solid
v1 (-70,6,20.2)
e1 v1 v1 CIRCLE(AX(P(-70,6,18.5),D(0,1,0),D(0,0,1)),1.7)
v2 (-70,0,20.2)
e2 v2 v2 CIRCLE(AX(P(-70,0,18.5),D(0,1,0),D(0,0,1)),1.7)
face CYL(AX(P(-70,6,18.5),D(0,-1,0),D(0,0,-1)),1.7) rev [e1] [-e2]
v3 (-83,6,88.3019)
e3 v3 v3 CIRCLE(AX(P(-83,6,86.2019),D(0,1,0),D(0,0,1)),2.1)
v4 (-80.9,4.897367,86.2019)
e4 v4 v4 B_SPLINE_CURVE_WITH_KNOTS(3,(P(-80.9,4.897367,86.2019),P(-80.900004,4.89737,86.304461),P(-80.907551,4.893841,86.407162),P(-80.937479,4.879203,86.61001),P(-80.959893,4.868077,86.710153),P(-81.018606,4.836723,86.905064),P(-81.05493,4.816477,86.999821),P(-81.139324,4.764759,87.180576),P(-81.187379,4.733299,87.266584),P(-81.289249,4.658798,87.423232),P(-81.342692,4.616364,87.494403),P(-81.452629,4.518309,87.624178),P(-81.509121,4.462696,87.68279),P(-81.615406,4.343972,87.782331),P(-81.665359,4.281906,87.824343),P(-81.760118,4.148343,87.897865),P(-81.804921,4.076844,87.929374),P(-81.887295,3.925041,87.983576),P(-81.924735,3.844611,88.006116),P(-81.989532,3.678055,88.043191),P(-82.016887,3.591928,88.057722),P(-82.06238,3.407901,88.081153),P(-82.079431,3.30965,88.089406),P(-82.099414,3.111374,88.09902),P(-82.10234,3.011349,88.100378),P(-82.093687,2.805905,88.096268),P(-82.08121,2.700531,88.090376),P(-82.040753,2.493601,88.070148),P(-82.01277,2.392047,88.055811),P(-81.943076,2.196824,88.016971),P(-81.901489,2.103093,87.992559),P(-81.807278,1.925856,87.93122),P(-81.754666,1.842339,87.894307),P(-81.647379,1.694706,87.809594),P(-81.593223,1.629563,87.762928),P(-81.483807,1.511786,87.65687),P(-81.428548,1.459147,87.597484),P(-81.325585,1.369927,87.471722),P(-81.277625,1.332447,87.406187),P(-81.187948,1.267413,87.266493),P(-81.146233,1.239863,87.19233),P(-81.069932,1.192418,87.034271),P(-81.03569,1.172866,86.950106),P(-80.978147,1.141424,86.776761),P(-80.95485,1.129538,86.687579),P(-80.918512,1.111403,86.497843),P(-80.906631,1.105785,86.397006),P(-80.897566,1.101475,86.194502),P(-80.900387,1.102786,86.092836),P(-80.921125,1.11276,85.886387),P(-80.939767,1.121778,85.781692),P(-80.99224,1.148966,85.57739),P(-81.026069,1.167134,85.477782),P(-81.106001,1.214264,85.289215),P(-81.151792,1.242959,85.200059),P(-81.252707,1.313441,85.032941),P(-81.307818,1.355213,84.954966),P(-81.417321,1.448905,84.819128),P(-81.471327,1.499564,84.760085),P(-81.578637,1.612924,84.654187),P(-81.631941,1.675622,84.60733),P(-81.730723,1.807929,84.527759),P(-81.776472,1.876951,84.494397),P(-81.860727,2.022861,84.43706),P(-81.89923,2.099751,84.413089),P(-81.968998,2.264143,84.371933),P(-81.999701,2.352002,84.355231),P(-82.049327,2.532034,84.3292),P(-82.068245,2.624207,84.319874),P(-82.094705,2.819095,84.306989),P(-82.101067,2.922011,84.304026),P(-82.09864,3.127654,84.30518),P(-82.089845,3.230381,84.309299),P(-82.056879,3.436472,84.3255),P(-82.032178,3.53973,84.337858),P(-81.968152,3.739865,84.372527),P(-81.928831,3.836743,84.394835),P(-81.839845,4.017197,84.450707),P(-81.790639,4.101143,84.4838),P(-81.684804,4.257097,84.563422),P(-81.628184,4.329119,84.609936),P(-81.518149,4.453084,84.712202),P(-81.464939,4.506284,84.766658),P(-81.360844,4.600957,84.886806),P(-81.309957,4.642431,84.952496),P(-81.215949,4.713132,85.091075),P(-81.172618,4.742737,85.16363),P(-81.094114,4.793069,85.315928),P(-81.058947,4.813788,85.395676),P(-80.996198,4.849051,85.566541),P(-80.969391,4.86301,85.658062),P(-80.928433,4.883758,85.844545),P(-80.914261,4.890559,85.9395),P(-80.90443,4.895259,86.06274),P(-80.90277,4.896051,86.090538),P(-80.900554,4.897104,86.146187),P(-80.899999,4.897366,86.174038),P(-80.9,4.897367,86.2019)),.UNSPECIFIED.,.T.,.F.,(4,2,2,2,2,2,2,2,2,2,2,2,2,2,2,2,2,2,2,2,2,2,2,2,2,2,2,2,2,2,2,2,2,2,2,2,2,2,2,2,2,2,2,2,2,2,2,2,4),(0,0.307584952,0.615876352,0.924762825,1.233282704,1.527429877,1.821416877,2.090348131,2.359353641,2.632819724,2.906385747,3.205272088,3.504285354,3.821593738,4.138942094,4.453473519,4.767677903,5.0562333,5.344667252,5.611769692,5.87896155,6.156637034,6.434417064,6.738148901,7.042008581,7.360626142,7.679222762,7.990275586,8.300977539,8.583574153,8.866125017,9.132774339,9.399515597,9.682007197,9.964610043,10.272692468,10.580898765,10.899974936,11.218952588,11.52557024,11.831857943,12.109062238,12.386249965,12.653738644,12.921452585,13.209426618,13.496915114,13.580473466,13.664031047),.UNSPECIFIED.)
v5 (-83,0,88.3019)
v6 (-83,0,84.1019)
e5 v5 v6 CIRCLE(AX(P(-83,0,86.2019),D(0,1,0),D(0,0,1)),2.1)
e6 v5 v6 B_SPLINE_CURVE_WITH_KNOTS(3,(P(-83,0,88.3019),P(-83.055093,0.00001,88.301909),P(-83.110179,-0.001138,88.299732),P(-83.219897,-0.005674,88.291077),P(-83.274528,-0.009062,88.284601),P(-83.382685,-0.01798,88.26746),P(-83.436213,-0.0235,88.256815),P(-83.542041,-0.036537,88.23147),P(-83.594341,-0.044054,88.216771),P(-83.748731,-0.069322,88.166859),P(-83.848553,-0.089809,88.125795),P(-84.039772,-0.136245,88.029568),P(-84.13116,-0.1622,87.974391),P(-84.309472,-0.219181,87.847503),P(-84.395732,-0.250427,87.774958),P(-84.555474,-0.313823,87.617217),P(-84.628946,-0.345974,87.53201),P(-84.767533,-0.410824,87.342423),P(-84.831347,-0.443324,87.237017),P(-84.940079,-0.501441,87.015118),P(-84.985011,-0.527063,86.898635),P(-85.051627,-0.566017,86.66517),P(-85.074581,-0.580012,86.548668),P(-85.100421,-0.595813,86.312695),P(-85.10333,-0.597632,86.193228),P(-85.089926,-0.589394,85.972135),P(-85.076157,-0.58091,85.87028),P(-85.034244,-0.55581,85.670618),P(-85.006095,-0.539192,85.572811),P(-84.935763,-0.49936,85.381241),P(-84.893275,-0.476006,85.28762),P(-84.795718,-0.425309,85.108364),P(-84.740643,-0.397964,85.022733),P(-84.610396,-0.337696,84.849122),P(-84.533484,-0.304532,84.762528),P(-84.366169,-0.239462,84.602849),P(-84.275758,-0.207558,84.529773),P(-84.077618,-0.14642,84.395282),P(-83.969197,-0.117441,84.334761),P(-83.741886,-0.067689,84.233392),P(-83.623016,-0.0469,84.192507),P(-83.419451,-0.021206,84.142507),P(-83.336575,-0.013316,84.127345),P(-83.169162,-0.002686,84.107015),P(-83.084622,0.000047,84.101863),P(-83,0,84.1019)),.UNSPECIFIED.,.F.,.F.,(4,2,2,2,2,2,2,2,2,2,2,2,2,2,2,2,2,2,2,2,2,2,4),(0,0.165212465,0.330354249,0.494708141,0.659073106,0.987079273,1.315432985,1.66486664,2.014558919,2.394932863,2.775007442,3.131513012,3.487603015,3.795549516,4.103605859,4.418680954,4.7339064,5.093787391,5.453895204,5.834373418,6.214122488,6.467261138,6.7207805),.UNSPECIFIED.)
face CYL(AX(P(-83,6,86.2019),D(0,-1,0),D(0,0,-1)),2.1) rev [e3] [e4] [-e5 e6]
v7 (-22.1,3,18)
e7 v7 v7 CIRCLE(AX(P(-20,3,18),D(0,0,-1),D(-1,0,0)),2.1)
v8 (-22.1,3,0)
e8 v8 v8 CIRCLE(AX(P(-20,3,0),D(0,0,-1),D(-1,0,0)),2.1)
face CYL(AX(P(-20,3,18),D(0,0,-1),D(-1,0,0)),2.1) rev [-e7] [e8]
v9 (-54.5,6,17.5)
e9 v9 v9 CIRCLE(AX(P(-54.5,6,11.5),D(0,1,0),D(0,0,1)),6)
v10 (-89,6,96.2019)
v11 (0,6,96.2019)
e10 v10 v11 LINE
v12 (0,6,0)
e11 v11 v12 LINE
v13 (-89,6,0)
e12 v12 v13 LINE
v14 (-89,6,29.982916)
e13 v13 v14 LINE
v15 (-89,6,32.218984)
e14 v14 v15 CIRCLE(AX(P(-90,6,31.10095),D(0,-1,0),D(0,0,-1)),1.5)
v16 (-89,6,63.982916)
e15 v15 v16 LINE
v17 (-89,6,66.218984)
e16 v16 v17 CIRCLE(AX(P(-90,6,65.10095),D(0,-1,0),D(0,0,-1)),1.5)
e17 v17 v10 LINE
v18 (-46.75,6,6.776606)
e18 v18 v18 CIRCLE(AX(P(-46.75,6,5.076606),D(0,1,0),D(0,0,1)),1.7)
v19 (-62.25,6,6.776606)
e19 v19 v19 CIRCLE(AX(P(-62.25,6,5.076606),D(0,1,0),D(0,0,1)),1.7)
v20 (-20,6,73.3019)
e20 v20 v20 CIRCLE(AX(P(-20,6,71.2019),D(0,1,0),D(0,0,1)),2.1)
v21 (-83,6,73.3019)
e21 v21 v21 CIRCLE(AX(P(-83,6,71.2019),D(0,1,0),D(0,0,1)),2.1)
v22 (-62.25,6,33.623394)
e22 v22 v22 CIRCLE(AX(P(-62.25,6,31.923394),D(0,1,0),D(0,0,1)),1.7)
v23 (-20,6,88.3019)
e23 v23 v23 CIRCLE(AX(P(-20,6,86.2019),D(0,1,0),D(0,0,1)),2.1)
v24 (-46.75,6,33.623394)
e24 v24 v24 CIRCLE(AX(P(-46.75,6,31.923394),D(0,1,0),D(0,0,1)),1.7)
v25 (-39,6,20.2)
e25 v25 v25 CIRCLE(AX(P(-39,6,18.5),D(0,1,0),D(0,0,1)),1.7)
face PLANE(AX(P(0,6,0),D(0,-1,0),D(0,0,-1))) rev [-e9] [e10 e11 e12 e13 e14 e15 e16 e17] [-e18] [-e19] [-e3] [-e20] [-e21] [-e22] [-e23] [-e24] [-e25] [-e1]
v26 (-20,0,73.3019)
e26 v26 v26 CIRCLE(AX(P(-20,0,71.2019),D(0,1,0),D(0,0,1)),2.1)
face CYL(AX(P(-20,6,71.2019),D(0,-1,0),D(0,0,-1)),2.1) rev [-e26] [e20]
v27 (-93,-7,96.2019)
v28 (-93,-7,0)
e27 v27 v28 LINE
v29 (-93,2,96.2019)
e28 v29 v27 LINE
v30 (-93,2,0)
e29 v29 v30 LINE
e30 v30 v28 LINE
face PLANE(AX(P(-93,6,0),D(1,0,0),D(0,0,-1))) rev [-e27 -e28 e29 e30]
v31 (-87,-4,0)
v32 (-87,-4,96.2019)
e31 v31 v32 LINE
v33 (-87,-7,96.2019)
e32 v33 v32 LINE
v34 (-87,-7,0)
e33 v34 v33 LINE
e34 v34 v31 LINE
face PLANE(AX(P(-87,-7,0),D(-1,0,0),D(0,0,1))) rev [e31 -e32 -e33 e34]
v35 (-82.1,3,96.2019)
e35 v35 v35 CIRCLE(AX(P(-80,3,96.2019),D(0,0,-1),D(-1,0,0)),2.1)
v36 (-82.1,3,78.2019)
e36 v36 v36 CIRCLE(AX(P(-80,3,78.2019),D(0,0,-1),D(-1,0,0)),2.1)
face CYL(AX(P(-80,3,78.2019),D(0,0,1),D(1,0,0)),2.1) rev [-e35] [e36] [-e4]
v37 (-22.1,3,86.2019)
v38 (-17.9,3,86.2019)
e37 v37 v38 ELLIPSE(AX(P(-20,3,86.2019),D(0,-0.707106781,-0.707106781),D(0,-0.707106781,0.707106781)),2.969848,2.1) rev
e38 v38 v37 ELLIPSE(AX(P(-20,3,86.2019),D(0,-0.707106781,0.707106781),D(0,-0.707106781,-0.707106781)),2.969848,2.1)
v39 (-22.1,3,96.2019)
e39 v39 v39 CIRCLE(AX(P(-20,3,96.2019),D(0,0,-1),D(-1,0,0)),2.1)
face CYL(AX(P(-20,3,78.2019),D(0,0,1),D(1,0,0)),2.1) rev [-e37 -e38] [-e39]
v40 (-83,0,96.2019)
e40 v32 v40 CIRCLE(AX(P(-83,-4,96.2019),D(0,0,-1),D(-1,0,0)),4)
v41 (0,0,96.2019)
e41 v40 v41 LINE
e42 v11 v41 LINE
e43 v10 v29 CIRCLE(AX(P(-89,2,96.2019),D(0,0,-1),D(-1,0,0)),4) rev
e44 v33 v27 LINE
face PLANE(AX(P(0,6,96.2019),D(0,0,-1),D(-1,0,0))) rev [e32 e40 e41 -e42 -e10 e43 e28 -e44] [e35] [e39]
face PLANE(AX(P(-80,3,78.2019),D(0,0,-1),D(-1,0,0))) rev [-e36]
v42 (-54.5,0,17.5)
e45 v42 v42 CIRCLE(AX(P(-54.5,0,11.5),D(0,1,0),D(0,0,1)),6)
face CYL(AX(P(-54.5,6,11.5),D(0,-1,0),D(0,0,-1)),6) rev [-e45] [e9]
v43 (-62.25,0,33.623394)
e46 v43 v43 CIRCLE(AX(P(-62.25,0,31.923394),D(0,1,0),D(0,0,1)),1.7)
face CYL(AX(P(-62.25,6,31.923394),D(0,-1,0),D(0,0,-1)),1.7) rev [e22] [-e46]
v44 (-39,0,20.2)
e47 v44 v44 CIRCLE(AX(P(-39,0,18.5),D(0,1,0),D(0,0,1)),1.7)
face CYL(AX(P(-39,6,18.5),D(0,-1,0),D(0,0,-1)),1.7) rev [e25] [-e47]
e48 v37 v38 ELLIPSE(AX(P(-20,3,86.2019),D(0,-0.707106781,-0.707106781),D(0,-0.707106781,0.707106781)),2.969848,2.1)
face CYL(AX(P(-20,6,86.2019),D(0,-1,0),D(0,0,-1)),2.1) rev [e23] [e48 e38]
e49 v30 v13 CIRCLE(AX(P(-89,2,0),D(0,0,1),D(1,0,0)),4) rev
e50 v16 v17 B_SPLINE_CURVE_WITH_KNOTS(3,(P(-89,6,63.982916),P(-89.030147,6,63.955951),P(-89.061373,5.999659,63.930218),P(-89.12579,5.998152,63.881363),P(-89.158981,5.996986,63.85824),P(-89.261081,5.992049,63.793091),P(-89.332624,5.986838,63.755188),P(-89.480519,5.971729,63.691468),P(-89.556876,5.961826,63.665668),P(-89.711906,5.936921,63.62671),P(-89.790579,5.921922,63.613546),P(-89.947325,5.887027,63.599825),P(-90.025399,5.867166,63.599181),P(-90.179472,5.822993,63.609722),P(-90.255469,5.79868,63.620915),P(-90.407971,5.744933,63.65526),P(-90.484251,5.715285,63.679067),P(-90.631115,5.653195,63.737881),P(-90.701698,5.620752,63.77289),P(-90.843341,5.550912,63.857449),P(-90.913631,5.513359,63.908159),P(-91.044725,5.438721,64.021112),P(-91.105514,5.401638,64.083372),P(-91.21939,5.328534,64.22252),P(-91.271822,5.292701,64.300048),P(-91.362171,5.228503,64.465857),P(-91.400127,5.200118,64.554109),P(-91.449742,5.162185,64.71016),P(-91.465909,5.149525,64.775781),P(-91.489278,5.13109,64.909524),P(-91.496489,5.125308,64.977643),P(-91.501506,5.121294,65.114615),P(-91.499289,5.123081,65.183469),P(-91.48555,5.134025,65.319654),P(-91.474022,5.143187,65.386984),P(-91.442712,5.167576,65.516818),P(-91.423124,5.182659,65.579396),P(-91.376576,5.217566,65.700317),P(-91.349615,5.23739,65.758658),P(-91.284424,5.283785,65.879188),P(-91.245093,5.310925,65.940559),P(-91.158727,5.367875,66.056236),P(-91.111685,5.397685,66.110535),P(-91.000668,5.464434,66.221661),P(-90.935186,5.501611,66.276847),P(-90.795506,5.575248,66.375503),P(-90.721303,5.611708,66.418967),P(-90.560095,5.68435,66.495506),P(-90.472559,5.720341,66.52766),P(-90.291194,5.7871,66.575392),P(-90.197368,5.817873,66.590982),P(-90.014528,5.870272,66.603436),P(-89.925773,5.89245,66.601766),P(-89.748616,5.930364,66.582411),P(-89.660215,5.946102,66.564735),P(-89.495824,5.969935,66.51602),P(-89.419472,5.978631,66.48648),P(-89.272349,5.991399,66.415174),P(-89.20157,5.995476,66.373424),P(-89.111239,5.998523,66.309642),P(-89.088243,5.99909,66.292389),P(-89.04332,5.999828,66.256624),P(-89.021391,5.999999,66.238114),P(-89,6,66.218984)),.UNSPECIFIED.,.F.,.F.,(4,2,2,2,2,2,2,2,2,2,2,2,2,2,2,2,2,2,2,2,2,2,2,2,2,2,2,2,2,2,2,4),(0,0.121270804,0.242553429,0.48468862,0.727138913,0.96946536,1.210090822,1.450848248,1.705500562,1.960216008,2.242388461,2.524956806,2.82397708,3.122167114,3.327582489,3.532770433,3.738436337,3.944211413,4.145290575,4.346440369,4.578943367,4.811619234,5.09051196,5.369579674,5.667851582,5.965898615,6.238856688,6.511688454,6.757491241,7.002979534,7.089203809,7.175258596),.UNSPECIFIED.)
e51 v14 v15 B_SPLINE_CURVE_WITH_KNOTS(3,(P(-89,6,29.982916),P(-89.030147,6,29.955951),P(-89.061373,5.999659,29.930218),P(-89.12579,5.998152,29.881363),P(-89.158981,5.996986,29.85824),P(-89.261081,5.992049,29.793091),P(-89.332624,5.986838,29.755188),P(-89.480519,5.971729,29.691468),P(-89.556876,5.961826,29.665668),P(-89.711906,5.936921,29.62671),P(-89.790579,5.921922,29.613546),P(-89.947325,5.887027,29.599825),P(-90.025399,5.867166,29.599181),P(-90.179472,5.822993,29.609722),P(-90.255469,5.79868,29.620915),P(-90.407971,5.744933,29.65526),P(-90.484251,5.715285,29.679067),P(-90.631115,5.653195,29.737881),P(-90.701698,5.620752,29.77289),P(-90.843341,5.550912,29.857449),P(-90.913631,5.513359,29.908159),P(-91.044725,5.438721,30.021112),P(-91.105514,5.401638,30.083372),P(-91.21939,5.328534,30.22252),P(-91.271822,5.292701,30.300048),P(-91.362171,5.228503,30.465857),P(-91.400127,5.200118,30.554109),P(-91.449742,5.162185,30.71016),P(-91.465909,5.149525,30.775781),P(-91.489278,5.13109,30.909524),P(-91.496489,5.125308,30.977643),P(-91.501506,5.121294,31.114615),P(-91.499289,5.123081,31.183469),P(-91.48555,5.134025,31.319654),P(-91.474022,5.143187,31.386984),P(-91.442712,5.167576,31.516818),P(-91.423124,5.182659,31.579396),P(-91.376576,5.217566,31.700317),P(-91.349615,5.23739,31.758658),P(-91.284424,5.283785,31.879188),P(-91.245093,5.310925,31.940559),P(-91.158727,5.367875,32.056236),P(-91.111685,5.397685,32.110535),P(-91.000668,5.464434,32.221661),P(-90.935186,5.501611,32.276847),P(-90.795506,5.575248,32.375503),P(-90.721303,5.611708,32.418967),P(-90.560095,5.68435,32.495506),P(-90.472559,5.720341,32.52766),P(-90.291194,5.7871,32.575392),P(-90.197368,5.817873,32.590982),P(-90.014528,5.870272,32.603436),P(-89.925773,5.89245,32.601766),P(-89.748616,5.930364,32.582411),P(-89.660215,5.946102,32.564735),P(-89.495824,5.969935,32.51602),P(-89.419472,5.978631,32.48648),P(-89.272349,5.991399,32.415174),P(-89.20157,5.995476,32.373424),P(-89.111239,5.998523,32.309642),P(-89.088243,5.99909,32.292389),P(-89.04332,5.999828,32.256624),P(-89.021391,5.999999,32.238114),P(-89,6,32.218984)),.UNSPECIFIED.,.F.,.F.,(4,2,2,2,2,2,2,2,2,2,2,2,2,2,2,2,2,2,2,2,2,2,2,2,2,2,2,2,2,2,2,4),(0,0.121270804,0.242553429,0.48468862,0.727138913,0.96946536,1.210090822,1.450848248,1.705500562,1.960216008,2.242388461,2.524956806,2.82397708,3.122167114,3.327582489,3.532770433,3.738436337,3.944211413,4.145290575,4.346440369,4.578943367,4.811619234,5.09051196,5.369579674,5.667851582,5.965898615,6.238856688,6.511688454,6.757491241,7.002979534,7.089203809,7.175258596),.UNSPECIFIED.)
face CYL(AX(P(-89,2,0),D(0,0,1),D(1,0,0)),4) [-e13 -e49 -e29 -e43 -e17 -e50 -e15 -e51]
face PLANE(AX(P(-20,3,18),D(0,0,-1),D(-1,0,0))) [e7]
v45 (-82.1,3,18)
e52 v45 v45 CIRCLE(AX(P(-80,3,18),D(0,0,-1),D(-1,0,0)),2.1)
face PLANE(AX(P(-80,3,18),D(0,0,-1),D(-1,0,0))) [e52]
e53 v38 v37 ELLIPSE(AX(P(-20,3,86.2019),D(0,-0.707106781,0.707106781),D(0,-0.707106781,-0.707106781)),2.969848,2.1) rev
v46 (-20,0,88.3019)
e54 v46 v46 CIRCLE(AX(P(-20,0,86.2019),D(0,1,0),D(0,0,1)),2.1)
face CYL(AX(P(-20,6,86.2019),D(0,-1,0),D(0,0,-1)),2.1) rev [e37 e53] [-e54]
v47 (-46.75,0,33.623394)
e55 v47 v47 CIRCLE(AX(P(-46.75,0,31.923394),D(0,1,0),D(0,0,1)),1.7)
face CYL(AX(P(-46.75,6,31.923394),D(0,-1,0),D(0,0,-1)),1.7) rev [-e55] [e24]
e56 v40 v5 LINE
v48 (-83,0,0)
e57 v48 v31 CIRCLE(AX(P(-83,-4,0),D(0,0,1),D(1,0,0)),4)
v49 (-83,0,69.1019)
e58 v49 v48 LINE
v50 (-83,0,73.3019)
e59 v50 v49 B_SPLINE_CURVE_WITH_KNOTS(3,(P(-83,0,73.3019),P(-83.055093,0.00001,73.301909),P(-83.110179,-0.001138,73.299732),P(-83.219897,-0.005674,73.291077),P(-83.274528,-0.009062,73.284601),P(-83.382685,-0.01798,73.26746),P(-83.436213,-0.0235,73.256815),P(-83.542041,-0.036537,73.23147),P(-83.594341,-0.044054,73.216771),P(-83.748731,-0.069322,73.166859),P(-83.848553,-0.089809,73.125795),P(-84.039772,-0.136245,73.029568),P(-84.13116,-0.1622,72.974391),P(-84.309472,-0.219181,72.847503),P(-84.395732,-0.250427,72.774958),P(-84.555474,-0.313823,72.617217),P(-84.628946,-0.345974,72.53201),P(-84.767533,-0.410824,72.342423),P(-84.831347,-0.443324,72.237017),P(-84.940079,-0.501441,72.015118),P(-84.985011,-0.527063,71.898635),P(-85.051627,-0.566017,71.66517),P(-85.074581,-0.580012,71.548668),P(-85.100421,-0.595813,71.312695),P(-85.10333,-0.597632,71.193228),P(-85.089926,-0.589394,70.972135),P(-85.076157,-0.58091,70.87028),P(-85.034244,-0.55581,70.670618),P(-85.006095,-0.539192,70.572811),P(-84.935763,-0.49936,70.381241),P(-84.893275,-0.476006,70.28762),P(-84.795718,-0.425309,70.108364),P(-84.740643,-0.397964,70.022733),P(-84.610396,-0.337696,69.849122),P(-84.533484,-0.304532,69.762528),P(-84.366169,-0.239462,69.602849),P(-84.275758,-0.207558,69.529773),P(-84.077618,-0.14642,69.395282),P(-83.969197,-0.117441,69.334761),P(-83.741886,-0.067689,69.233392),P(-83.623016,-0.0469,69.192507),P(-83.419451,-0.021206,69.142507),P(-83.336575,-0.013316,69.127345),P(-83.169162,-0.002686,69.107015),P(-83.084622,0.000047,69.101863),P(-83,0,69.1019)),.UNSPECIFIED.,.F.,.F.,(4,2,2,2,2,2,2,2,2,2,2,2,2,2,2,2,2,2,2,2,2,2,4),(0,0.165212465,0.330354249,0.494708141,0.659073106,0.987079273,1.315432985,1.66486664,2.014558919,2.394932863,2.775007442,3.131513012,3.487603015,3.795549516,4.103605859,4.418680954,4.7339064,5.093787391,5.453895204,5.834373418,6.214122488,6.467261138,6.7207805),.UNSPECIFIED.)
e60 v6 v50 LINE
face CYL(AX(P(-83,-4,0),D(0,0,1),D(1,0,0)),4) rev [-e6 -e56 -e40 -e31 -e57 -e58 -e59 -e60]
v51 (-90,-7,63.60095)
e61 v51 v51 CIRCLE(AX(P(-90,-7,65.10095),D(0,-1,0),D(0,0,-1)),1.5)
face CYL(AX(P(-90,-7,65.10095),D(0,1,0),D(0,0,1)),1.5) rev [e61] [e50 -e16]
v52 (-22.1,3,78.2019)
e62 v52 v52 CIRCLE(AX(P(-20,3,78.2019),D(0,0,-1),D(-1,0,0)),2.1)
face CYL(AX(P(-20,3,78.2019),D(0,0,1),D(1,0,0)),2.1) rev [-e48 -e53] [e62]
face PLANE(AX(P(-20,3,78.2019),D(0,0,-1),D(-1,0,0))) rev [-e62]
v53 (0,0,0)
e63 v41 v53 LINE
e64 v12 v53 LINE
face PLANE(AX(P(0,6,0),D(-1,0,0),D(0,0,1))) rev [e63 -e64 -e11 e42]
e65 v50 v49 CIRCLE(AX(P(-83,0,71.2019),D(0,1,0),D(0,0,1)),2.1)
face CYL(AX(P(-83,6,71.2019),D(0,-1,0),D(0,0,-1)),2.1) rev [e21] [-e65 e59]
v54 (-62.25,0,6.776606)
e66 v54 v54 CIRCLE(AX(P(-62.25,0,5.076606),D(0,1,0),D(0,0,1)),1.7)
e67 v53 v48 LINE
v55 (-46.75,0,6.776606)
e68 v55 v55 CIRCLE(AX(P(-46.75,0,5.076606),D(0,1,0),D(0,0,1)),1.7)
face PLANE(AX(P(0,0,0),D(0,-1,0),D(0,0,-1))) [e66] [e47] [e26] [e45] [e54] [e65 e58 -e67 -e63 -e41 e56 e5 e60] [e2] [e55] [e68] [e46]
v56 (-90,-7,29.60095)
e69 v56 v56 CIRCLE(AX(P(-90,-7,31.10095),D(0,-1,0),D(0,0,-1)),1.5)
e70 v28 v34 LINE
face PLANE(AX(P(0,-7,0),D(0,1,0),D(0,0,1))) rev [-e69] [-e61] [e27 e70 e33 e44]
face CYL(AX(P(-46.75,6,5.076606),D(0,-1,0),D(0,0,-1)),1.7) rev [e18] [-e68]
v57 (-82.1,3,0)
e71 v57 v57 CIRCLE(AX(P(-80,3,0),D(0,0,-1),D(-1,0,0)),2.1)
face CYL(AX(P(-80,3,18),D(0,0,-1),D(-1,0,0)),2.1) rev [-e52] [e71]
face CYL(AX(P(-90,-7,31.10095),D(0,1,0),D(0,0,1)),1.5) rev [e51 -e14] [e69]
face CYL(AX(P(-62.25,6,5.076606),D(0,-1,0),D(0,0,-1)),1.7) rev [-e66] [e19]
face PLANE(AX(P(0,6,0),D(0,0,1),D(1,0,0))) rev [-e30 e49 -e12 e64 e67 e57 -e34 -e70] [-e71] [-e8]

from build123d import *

# Parameters (mm, degrees)
SKETCH1_W           = 93
SKETCH1_H           = 96.2019
SKETCH1_R           = 6
SKETCH1_R_2         = 1.7
SKETCH1_R_3         = 2.1
BOSS_EXTRUDE1_DEPTH = 6
SKETCH2_W           = 6
SKETCH2_H           = 96.2019
SKETCH2_R           = 1.5
BOSS_EXTRUDE2_DEPTH = 7
SKETCH2_3_R         = 1.5
CUT_EXTRUDE2_DEPTH  = 134.988079931
FILLET1_R           = 4
SKETCH3_R           = 2.1
CUT_EXTRUDE3_DEPTH  = 18
CUT_EXTRUDE4_START  = -78.2019
SKETCH3_2_R         = 2.1
CUT_EXTRUDE4_DEPTH  = 18


with BuildPart() as part:
    # Sketch1 → Boss-Extrude1 (new body)
    with BuildSketch(Plane(origin=(0, 0, 0), x_dir=(-1, 0, 0), z_dir=(0, 1, 0))):
        with Locations((46.5, 48.10095)):
            Rectangle(SKETCH1_W, SKETCH1_H)
        with Locations(Location((54.5, 11.5, 0), (0, 0, 90))):
            Circle(SKETCH1_R, mode=Mode.SUBTRACT)
        with Locations(Location((39, 18.5, 0), (0, 0, 90))):
            Circle(SKETCH1_R_2, mode=Mode.SUBTRACT)
        with Locations(Location((46.75, 31.923393759, 0), (0, 0, 90))):
            Circle(SKETCH1_R_2, mode=Mode.SUBTRACT)
        with Locations(Location((62.25, 31.923393759, 0), (0, 0, 90))):
            Circle(SKETCH1_R_2, mode=Mode.SUBTRACT)
        with Locations(Location((70, 18.5, 0), (0, 0, 90))):
            Circle(SKETCH1_R_2, mode=Mode.SUBTRACT)
        with Locations(Location((62.25, 5.076606241, 0), (0, 0, 90))):
            Circle(SKETCH1_R_2, mode=Mode.SUBTRACT)
        with Locations(Location((46.75, 5.076606241, 0), (0, 0, 90))):
            Circle(SKETCH1_R_2, mode=Mode.SUBTRACT)
        with Locations(Location((20, 86.2019, 0), (0, 0, 90))):
            Circle(SKETCH1_R_3, mode=Mode.SUBTRACT)
        with Locations(Location((83, 86.2019, 0), (0, 0, 90))):
            Circle(SKETCH1_R_3, mode=Mode.SUBTRACT)
        with Locations(Location((83, 71.2019, 0), (0, 0, 90))):
            Circle(SKETCH1_R_3, mode=Mode.SUBTRACT)
        with Locations(Location((20, 71.2019, 0), (0, 0, 90))):
            Circle(SKETCH1_R_3, mode=Mode.SUBTRACT)
    extrude(amount=BOSS_EXTRUDE1_DEPTH)

    # Sketch2 → Boss-Extrude2 (add)
    with BuildSketch(Plane(origin=(0, 0, 0), x_dir=(-1, 0, 0), z_dir=(0, -1, 0))):
        with Locations((90, -48.10095)):
            Rectangle(SKETCH2_W, SKETCH2_H)
        with Locations(Location((90, -65.10095, 0), (0, 0, 90))):
            Circle(SKETCH2_R, mode=Mode.SUBTRACT)
        with Locations(Location((90, -31.10095, 0), (0, 0, 90))):
            Circle(SKETCH2_R, mode=Mode.SUBTRACT)
    extrude(amount=BOSS_EXTRUDE2_DEPTH)

    # Sketch2<3> → Cut-Extrude2 (cut, through all)
    with BuildSketch(Plane(origin=(0, 0, 0), x_dir=(-1, 0, 0), z_dir=(0, -1, 0))):
        with Locations(Location((90, -31.10095, 0), (0, 0, 90))):
            Circle(SKETCH2_3_R)
        with Locations(Location((90, -65.10095, 0), (0, 0, 90))):
            Circle(SKETCH2_3_R)
    extrude(amount=-CUT_EXTRUDE2_DEPTH, mode=Mode.SUBTRACT)

    # Fillet1
    # the kernel refuses this fillet: 4 mm, written as the material it adds along each edge
    with BuildSketch(Plane(origin=(-87, 0, 96.2019), x_dir=(0, -1, 0), z_dir=(0, 0, -1))) as fillet1_piece_1_section:
        with BuildLine():
            CenterArc((FILLET1_R, -FILLET1_R), FILLET1_R, 90, 90)
            Line((0, -FILLET1_R), (0, 0))
            Line((0, 0), (FILLET1_R, 0))
        make_face()
    fillet1_piece_1 = extrude(amount=96.2019, mode=Mode.PRIVATE)
    fillet1_piece_1 = fillet1_piece_1 - Plane(origin=(-83, -0.912137569, 71.2019), x_dir=(0, 0, 1), z_dir=(0, -1, 0)) * Cylinder(2.1, 209, mode=Mode.PRIVATE)
    fillet1_piece_1 = fillet1_piece_1 - Plane(origin=(-83, -0.912137569, 86.2019), x_dir=(0, 0, 1), z_dir=(0, -1, 0)) * Cylinder(2.1, 209, mode=Mode.PRIVATE)
    add(fillet1_piece_1)
    # the kernel refuses this fillet: 4 mm, written as the material it takes off along each edge
    with BuildSketch(Plane(origin=(-93, 6, -10), x_dir=(1, 0, 0), z_dir=(0, 0, 1))) as fillet1_2_piece_1:
        with BuildLine():
            CenterArc((FILLET1_R, -FILLET1_R), FILLET1_R, 90, 90)
            Line((0, -FILLET1_R), (0, 0))
            Line((0, 0), (FILLET1_R, 0))
        make_face()
    extrude(amount=116.2019, mode=Mode.SUBTRACT)

    # Sketch3 → Cut-Extrude3 (cut)
    with BuildSketch(Plane(origin=(0, 0, 0), x_dir=(1, 0, 0), z_dir=(0, 0, -1))):
        with Locations(Location((-80, -3, 0), (0, 0, 180))):
            Circle(SKETCH3_R)
        with Locations(Location((-20, -3, 0), (0, 0, 180))):
            Circle(SKETCH3_R)
    extrude(amount=-CUT_EXTRUDE3_DEPTH, mode=Mode.SUBTRACT)

    # Sketch3<2> → Cut-Extrude4 (cut)
    with BuildSketch(Plane(origin=(0, 0, 0), x_dir=(1, 0, 0), z_dir=(0, 0, -1)).offset(CUT_EXTRUDE4_START)):
        with Locations(Location((-80, -3, 0), (0, 0, 180))):
            Circle(SKETCH3_2_R)
        with Locations(Location((-20, -3, 0), (0, 0, 180))):
            Circle(SKETCH3_2_R)
    extrude(amount=-CUT_EXTRUDE4_DEPTH, mode=Mode.SUBTRACT)


solid = part.part
